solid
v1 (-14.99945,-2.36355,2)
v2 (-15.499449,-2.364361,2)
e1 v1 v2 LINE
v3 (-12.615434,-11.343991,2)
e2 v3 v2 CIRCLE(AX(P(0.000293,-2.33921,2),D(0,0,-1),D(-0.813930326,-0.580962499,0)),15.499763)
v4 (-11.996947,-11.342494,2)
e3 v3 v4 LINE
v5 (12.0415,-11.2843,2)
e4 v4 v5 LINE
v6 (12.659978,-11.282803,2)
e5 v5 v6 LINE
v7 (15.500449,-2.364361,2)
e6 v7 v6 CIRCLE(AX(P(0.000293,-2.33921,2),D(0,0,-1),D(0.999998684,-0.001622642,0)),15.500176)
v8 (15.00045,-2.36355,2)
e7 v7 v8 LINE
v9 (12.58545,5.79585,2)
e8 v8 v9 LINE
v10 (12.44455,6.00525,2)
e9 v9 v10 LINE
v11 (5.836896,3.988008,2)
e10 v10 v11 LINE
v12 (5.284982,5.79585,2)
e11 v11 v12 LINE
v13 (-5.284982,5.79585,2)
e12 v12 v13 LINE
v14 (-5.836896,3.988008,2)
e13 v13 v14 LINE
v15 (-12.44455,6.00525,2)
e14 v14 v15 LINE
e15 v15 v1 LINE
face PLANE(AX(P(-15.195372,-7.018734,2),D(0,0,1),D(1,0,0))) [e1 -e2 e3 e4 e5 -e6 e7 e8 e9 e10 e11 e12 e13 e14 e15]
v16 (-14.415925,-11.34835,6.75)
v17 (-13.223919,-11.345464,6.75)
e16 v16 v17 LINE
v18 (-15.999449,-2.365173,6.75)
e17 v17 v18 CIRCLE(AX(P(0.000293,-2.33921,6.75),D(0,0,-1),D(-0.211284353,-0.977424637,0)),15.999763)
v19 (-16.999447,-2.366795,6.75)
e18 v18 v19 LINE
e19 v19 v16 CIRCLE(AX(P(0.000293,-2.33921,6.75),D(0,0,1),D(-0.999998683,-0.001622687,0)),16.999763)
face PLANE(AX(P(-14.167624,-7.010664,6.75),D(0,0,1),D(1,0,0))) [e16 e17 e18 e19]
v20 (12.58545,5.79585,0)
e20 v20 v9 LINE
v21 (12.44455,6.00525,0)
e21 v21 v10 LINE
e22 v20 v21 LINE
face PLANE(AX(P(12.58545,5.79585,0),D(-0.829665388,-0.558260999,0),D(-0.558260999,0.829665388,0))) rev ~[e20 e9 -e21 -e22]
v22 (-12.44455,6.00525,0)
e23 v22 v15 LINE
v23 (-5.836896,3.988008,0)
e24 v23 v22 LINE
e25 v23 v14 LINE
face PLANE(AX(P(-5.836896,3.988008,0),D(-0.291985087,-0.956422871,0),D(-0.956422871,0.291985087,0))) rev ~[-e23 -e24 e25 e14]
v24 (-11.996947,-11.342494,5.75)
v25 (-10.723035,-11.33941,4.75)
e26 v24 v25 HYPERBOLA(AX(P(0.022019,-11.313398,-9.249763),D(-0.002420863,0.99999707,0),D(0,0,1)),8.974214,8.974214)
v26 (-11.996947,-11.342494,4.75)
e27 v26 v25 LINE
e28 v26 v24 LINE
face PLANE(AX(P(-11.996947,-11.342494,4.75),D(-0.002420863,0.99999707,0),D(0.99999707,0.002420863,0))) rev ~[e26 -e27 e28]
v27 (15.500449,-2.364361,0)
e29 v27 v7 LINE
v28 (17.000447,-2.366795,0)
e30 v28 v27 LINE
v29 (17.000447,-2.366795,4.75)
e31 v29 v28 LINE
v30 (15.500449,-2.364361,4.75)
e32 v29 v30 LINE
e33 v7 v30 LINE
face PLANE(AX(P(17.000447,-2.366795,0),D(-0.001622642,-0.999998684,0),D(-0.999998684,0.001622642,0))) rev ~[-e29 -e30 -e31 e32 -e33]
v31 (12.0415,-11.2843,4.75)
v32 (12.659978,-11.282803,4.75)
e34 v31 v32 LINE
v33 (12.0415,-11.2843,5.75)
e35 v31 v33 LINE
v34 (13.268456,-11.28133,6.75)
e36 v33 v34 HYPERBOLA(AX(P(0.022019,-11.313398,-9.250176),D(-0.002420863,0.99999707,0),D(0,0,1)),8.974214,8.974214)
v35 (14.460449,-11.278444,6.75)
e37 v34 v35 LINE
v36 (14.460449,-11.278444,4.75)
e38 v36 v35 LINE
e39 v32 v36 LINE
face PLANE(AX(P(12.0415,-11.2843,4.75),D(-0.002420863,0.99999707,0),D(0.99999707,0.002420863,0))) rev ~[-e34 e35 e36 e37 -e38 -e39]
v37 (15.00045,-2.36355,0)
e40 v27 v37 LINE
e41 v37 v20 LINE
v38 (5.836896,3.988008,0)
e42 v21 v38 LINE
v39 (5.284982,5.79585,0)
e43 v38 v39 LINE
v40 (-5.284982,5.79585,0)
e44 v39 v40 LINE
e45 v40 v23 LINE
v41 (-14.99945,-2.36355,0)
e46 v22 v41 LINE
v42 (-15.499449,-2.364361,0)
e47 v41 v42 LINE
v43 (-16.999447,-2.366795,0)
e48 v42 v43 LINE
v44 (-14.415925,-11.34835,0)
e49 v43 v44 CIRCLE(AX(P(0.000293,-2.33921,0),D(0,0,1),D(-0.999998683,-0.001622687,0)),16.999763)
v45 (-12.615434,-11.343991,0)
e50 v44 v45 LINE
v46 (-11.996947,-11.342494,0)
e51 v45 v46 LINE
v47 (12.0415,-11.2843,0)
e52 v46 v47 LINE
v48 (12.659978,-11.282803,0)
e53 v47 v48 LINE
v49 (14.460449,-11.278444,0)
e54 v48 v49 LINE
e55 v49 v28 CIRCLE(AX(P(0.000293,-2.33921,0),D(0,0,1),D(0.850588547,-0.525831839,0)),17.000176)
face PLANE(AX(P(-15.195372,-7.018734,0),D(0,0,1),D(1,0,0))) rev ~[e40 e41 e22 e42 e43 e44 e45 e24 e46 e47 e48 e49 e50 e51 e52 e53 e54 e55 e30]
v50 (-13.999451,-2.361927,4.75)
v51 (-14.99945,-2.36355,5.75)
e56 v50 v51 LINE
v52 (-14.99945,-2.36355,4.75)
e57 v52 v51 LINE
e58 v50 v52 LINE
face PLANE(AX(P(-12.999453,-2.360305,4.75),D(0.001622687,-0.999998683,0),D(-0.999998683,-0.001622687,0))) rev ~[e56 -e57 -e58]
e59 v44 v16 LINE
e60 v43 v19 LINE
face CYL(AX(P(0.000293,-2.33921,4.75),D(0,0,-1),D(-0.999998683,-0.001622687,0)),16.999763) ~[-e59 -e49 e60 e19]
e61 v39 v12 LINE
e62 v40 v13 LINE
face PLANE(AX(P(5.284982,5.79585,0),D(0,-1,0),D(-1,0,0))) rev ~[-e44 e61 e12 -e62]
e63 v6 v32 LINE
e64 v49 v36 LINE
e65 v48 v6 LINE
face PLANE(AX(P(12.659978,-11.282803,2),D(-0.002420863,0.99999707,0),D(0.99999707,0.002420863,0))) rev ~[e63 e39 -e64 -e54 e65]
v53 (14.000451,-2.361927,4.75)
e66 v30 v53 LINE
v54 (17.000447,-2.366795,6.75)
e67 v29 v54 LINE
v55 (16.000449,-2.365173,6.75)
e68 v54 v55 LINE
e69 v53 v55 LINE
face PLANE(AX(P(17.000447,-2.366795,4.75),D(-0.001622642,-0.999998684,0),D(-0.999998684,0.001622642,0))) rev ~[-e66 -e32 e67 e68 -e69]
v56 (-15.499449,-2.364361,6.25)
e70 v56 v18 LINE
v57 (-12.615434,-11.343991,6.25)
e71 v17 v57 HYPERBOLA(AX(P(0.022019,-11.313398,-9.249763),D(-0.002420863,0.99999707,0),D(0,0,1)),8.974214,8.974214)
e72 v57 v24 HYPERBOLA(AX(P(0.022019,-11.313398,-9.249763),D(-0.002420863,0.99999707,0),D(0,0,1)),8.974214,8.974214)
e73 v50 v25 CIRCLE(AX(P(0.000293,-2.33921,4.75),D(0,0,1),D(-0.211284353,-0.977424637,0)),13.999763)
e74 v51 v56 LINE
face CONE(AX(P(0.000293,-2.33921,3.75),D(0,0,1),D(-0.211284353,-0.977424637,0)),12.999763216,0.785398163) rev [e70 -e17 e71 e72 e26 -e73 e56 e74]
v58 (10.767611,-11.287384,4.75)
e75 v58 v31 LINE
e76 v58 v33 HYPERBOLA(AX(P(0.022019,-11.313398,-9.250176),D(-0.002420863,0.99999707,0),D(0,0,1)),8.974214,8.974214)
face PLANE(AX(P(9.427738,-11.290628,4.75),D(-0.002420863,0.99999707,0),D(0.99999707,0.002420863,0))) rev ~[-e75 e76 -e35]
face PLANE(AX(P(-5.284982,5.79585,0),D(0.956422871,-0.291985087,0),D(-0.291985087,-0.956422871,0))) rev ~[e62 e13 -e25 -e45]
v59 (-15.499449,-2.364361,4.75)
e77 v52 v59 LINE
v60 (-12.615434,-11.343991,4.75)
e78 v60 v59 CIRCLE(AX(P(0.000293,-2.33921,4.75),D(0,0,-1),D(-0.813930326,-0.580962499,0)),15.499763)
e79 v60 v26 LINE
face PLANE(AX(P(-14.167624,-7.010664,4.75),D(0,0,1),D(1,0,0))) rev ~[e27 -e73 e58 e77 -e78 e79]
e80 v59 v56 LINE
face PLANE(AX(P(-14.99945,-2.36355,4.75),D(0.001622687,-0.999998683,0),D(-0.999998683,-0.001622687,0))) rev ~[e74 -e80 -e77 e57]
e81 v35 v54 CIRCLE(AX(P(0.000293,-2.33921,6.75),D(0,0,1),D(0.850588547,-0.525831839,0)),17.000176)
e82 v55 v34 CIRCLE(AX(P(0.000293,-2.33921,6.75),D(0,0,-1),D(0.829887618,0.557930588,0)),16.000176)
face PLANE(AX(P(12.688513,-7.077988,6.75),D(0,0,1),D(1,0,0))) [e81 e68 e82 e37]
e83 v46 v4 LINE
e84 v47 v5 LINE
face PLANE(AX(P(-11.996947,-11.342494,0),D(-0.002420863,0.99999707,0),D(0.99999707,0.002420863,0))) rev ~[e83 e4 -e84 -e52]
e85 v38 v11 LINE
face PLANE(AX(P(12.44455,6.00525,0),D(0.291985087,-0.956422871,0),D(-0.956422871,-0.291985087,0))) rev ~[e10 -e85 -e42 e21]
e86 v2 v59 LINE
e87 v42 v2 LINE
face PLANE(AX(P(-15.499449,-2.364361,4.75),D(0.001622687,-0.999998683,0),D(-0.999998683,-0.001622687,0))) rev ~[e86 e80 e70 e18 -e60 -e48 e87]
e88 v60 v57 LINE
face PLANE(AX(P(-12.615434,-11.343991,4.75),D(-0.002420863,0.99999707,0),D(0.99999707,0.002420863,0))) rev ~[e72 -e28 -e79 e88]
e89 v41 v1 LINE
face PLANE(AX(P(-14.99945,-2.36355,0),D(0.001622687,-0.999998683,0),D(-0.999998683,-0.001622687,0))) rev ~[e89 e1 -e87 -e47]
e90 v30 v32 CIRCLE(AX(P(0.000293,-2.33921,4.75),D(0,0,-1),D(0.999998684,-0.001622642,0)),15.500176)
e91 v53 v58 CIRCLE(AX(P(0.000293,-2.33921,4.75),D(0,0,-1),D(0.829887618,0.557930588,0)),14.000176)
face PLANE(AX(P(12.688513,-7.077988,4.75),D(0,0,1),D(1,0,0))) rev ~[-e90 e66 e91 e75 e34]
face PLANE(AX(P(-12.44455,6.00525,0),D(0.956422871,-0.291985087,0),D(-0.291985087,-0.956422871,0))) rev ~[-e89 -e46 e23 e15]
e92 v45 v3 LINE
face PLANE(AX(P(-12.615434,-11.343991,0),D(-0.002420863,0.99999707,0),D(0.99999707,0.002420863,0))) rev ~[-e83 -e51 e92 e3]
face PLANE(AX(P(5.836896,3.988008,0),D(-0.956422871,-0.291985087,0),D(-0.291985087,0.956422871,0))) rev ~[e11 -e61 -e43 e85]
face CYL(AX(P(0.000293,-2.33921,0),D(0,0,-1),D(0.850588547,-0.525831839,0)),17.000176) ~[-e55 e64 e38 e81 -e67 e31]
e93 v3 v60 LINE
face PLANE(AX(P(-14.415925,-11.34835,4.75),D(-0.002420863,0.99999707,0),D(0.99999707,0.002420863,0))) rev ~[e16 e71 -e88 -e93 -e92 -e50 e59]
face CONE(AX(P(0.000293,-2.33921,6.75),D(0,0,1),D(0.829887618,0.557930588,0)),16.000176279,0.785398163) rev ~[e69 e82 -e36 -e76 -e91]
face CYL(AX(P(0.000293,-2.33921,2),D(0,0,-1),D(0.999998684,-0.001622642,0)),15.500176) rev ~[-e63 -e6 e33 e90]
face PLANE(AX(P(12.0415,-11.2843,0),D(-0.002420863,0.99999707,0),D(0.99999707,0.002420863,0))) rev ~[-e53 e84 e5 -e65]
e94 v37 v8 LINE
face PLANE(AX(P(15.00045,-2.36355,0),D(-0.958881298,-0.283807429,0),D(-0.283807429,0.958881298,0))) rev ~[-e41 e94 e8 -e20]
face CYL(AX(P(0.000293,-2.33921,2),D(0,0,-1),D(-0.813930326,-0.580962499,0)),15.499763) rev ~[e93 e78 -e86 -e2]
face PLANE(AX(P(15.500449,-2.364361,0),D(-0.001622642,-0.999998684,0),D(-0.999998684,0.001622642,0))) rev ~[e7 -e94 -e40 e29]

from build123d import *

# Parameters (mm, degrees)
F2_DEPTH    = 2
F4_DEPTH    = 2.75
F6_DEPTH    = 2
F7_T2_ANGLE = 111.7162943046
F7_T4_ANGLE = 111.4349059649


# Not quite as in the source:
# - a fillet or chamfer that OpenCascade refuses, or shapes differently, is made with other operations: its cross-section is extruded or revolved along the edge and cut away or added


with BuildPart() as f2:
    # F1 (on Top) → F2 (new body)
    with BuildSketch(Plane.XY):
        with BuildLine():
            ThreePointArc((-12.615433857, -11.3439912447), (-14.7570217863, -7.0788626246), (-15.4994493417, -2.3643613435))
            Line((-15.4994493417, -2.3643613435), (-16.9994473669, -2.3667953738))
            ThreePointArc((-16.9994473669, -2.3667953738), (-16.3370166369, -7.0385981193), (-14.4159247362, -11.34835))
            Line((-14.4159247362, -11.34835), (-12.615433857, -11.3439912447))
        make_face()
        with BuildLine():
            ThreePointArc((-11.9969468723, -11.3424939678), (-14.2251992258, -7.0961265352), (-14.99945, -2.36355))
            Line((-14.99945, -2.36355), (-15.4994493417, -2.3643613435))
            ThreePointArc((-15.4994493417, -2.3643613435), (-14.7570217863, -7.0788626246), (-12.615433857, -11.3439912447))
            Line((-12.615433857, -11.3439912447), (-11.9969468723, -11.3424939678))
        make_face()
        with BuildLine():
            Line((-12.44455, 6.00525), (-14.99945, -2.36355))
            ThreePointArc((-14.99945, -2.36355), (-14.2251992258, -7.0961265352), (-11.9969468723, -11.3424939678))
            Line((-11.9969468723, -11.3424939678), (12.0415, -11.2843))
            ThreePointArc((12.0415, -11.2843), (14.2377010351, -7.0616579823), (15.00045, -2.36355))
            Line((15.00045, -2.36355), (12.58545, 5.79585))
            Line((12.58545, 5.79585), (12.44455, 6.00525))
            Line((12.44455, 6.00525), (5.8368961963, 3.9880080175))
            Line((5.8368961963, 3.9880080175), (5.2849824833, 5.79585))
            Line((5.2849824833, 5.79585), (0, 5.79585))
            Line((0, 5.79585), (-5.2849824833, 5.79585))
            Line((-5.2849824833, 5.79585), (-5.8368961963, 3.9880080175))
            Line((-5.8368961963, 3.9880080175), (-12.44455, 6.00525))
        make_face()
        with BuildLine():
            ThreePointArc((15.00045, -2.36355), (14.2377010351, -7.0616579823), (12.0415, -11.2843))
            Line((12.0415, -11.2843), (12.6599780988, -11.2828027446))
            ThreePointArc((12.6599780988, -11.2828027446), (14.7694777267, -7.043108573), (15.5004493418, -2.3643613211))
            Line((15.5004493418, -2.3643613211), (15.00045, -2.36355))
        make_face()
        with BuildLine():
            ThreePointArc((15.5004493418, -2.3643613211), (14.7694777267, -7.043108573), (12.6599780988, -11.2828027446))
            Line((12.6599780988, -11.2828027446), (14.4604487154, -11.2784440383))
            ThreePointArc((14.4604487154, -11.2784440383), (16.3493648109, -6.9990233555), (17.000447367, -2.3667952845))
            Line((17.000447367, -2.3667952845), (15.5004493418, -2.3643613211))
        make_face()
    extrude(amount=F2_DEPTH)

    # F3 (on face) → F4 (join)
    with BuildSketch(Plane.XY.offset(2)):
        with BuildLine():
            ThreePointArc((-12.615433857, -11.3439912447), (-14.7570217863, -7.0788626246), (-15.4994493417, -2.3643613435))
            Line((-15.4994493417, -2.3643613435), (-16.9994473669, -2.3667953738))
            ThreePointArc((-16.9994473669, -2.3667953738), (-16.3370166369, -7.0385981193), (-14.4159247362, -11.34835))
            Line((-14.4159247362, -11.34835), (-12.615433857, -11.3439912447))
        make_face()
        with BuildLine():
            ThreePointArc((15.5004493418, -2.3643613211), (14.7694777267, -7.043108573), (12.6599780988, -11.2828027446))
            Line((12.6599780988, -11.2828027446), (14.4604487154, -11.2784440383))
            ThreePointArc((14.4604487154, -11.2784440383), (16.3493648109, -6.9990233555), (17.000447367, -2.3667952845))
            Line((17.000447367, -2.3667952845), (15.5004493418, -2.3643613211))
        make_face()
    extrude(amount=F4_DEPTH)

    # F5 (on face) → F6 (join)
    with BuildSketch(Plane.XY.offset(4.75)):
        with BuildLine():
            ThreePointArc((-11.9969468723, -11.3424939678), (-14.2251992258, -7.0961265352), (-14.99945, -2.36355))
            Line((-14.99945, -2.36355), (-15.4994493417, -2.3643613435))
            ThreePointArc((-15.4994493417, -2.3643613435), (-14.7570217863, -7.0788626246), (-12.615433857, -11.3439912447))
            Line((-12.615433857, -11.3439912447), (-11.9969468723, -11.3424939678))
        make_face()
        with BuildLine():
            ThreePointArc((-12.615433857, -11.3439912447), (-14.7570217863, -7.0788626246), (-15.4994493417, -2.3643613435))
            Line((-15.4994493417, -2.3643613435), (-16.9994473669, -2.3667953738))
            ThreePointArc((-16.9994473669, -2.3667953738), (-16.3370166369, -7.0385981193), (-14.4159247362, -11.34835))
            Line((-14.4159247362, -11.34835), (-12.615433857, -11.3439912447))
        make_face()
        with BuildLine():
            Line((-12.9994526331, -2.3603046262), (-14.99945, -2.36355))
            ThreePointArc((-14.99945, -2.36355), (-14.2251992258, -7.0961265352), (-11.9969468723, -11.3424939678))
            Line((-11.9969468723, -11.3424939678), (-9.3831293237, -11.3361662539))
            ThreePointArc((-9.3831293237, -11.3361662539), (-12.0576120471, -7.1972712434), (-12.9994526331, -2.3603046262))
        make_face()
        with BuildLine():
            ThreePointArc((13.000452633, -2.3603047155), (12.0703811691, -7.1680366652), (9.4277378752, -11.2906275797))
            Line((9.4277378752, -11.2906275797), (12.0415, -11.2843))
            ThreePointArc((12.0415, -11.2843), (14.2377010351, -7.0616579823), (15.00045, -2.36355))
            Line((15.00045, -2.36355), (13.000452633, -2.3603047155))
        make_face()
        with BuildLine():
            ThreePointArc((15.00045, -2.36355), (14.2377010351, -7.0616579823), (12.0415, -11.2843))
            Line((12.0415, -11.2843), (14.4604487154, -11.2784440383))
            ThreePointArc((14.4604487154, -11.2784440383), (16.3493648109, -6.9990233555), (17.000447367, -2.3667952845))
            Line((17.000447367, -2.3667952845), (15.00045, -2.36355))
        make_face()
    extrude(amount=F6_DEPTH)

    # F7: chamfer of 3 on 2 edges, made by hand

    # F7_s1 → F7_t2 (revolve, cut)
    with BuildSketch(Plane(origin=(0.4833612439, -0.1044854652, 0), x_dir=(0, 0, 1), z_dir=(0.9774246375, -0.2112843535, 0))):
        Polygon((3.75, 15.2861027758), (6.75, 18.2861027758), (6.75, 15.2861027758), align=None)
    revolve(axis=Axis((0.0002934681, -2.3392100804, 6.75), (0, 0, -1)), revolution_arc=F7_T2_ANGLE, mode=Mode.SUBTRACT)

    # F7_s3 → F7_t4 (revolve, cut)
    with BuildSketch(Plane(origin=(1.0831916717, -1.6111813469, 0), x_dir=(0, 0, 1), z_dir=(-0.5579305881, 0.8298876182, 0))):
        Polygon((6.75, 14.695302969), (3.75, 11.695302969), (6.75, 11.695302969), align=None)
    revolve(axis=Axis((0.0002934681, -2.3392100804, 6.75), (0, 0, -1)), revolution_arc=F7_T4_ANGLE, mode=Mode.SUBTRACT)


solid = f2.part
